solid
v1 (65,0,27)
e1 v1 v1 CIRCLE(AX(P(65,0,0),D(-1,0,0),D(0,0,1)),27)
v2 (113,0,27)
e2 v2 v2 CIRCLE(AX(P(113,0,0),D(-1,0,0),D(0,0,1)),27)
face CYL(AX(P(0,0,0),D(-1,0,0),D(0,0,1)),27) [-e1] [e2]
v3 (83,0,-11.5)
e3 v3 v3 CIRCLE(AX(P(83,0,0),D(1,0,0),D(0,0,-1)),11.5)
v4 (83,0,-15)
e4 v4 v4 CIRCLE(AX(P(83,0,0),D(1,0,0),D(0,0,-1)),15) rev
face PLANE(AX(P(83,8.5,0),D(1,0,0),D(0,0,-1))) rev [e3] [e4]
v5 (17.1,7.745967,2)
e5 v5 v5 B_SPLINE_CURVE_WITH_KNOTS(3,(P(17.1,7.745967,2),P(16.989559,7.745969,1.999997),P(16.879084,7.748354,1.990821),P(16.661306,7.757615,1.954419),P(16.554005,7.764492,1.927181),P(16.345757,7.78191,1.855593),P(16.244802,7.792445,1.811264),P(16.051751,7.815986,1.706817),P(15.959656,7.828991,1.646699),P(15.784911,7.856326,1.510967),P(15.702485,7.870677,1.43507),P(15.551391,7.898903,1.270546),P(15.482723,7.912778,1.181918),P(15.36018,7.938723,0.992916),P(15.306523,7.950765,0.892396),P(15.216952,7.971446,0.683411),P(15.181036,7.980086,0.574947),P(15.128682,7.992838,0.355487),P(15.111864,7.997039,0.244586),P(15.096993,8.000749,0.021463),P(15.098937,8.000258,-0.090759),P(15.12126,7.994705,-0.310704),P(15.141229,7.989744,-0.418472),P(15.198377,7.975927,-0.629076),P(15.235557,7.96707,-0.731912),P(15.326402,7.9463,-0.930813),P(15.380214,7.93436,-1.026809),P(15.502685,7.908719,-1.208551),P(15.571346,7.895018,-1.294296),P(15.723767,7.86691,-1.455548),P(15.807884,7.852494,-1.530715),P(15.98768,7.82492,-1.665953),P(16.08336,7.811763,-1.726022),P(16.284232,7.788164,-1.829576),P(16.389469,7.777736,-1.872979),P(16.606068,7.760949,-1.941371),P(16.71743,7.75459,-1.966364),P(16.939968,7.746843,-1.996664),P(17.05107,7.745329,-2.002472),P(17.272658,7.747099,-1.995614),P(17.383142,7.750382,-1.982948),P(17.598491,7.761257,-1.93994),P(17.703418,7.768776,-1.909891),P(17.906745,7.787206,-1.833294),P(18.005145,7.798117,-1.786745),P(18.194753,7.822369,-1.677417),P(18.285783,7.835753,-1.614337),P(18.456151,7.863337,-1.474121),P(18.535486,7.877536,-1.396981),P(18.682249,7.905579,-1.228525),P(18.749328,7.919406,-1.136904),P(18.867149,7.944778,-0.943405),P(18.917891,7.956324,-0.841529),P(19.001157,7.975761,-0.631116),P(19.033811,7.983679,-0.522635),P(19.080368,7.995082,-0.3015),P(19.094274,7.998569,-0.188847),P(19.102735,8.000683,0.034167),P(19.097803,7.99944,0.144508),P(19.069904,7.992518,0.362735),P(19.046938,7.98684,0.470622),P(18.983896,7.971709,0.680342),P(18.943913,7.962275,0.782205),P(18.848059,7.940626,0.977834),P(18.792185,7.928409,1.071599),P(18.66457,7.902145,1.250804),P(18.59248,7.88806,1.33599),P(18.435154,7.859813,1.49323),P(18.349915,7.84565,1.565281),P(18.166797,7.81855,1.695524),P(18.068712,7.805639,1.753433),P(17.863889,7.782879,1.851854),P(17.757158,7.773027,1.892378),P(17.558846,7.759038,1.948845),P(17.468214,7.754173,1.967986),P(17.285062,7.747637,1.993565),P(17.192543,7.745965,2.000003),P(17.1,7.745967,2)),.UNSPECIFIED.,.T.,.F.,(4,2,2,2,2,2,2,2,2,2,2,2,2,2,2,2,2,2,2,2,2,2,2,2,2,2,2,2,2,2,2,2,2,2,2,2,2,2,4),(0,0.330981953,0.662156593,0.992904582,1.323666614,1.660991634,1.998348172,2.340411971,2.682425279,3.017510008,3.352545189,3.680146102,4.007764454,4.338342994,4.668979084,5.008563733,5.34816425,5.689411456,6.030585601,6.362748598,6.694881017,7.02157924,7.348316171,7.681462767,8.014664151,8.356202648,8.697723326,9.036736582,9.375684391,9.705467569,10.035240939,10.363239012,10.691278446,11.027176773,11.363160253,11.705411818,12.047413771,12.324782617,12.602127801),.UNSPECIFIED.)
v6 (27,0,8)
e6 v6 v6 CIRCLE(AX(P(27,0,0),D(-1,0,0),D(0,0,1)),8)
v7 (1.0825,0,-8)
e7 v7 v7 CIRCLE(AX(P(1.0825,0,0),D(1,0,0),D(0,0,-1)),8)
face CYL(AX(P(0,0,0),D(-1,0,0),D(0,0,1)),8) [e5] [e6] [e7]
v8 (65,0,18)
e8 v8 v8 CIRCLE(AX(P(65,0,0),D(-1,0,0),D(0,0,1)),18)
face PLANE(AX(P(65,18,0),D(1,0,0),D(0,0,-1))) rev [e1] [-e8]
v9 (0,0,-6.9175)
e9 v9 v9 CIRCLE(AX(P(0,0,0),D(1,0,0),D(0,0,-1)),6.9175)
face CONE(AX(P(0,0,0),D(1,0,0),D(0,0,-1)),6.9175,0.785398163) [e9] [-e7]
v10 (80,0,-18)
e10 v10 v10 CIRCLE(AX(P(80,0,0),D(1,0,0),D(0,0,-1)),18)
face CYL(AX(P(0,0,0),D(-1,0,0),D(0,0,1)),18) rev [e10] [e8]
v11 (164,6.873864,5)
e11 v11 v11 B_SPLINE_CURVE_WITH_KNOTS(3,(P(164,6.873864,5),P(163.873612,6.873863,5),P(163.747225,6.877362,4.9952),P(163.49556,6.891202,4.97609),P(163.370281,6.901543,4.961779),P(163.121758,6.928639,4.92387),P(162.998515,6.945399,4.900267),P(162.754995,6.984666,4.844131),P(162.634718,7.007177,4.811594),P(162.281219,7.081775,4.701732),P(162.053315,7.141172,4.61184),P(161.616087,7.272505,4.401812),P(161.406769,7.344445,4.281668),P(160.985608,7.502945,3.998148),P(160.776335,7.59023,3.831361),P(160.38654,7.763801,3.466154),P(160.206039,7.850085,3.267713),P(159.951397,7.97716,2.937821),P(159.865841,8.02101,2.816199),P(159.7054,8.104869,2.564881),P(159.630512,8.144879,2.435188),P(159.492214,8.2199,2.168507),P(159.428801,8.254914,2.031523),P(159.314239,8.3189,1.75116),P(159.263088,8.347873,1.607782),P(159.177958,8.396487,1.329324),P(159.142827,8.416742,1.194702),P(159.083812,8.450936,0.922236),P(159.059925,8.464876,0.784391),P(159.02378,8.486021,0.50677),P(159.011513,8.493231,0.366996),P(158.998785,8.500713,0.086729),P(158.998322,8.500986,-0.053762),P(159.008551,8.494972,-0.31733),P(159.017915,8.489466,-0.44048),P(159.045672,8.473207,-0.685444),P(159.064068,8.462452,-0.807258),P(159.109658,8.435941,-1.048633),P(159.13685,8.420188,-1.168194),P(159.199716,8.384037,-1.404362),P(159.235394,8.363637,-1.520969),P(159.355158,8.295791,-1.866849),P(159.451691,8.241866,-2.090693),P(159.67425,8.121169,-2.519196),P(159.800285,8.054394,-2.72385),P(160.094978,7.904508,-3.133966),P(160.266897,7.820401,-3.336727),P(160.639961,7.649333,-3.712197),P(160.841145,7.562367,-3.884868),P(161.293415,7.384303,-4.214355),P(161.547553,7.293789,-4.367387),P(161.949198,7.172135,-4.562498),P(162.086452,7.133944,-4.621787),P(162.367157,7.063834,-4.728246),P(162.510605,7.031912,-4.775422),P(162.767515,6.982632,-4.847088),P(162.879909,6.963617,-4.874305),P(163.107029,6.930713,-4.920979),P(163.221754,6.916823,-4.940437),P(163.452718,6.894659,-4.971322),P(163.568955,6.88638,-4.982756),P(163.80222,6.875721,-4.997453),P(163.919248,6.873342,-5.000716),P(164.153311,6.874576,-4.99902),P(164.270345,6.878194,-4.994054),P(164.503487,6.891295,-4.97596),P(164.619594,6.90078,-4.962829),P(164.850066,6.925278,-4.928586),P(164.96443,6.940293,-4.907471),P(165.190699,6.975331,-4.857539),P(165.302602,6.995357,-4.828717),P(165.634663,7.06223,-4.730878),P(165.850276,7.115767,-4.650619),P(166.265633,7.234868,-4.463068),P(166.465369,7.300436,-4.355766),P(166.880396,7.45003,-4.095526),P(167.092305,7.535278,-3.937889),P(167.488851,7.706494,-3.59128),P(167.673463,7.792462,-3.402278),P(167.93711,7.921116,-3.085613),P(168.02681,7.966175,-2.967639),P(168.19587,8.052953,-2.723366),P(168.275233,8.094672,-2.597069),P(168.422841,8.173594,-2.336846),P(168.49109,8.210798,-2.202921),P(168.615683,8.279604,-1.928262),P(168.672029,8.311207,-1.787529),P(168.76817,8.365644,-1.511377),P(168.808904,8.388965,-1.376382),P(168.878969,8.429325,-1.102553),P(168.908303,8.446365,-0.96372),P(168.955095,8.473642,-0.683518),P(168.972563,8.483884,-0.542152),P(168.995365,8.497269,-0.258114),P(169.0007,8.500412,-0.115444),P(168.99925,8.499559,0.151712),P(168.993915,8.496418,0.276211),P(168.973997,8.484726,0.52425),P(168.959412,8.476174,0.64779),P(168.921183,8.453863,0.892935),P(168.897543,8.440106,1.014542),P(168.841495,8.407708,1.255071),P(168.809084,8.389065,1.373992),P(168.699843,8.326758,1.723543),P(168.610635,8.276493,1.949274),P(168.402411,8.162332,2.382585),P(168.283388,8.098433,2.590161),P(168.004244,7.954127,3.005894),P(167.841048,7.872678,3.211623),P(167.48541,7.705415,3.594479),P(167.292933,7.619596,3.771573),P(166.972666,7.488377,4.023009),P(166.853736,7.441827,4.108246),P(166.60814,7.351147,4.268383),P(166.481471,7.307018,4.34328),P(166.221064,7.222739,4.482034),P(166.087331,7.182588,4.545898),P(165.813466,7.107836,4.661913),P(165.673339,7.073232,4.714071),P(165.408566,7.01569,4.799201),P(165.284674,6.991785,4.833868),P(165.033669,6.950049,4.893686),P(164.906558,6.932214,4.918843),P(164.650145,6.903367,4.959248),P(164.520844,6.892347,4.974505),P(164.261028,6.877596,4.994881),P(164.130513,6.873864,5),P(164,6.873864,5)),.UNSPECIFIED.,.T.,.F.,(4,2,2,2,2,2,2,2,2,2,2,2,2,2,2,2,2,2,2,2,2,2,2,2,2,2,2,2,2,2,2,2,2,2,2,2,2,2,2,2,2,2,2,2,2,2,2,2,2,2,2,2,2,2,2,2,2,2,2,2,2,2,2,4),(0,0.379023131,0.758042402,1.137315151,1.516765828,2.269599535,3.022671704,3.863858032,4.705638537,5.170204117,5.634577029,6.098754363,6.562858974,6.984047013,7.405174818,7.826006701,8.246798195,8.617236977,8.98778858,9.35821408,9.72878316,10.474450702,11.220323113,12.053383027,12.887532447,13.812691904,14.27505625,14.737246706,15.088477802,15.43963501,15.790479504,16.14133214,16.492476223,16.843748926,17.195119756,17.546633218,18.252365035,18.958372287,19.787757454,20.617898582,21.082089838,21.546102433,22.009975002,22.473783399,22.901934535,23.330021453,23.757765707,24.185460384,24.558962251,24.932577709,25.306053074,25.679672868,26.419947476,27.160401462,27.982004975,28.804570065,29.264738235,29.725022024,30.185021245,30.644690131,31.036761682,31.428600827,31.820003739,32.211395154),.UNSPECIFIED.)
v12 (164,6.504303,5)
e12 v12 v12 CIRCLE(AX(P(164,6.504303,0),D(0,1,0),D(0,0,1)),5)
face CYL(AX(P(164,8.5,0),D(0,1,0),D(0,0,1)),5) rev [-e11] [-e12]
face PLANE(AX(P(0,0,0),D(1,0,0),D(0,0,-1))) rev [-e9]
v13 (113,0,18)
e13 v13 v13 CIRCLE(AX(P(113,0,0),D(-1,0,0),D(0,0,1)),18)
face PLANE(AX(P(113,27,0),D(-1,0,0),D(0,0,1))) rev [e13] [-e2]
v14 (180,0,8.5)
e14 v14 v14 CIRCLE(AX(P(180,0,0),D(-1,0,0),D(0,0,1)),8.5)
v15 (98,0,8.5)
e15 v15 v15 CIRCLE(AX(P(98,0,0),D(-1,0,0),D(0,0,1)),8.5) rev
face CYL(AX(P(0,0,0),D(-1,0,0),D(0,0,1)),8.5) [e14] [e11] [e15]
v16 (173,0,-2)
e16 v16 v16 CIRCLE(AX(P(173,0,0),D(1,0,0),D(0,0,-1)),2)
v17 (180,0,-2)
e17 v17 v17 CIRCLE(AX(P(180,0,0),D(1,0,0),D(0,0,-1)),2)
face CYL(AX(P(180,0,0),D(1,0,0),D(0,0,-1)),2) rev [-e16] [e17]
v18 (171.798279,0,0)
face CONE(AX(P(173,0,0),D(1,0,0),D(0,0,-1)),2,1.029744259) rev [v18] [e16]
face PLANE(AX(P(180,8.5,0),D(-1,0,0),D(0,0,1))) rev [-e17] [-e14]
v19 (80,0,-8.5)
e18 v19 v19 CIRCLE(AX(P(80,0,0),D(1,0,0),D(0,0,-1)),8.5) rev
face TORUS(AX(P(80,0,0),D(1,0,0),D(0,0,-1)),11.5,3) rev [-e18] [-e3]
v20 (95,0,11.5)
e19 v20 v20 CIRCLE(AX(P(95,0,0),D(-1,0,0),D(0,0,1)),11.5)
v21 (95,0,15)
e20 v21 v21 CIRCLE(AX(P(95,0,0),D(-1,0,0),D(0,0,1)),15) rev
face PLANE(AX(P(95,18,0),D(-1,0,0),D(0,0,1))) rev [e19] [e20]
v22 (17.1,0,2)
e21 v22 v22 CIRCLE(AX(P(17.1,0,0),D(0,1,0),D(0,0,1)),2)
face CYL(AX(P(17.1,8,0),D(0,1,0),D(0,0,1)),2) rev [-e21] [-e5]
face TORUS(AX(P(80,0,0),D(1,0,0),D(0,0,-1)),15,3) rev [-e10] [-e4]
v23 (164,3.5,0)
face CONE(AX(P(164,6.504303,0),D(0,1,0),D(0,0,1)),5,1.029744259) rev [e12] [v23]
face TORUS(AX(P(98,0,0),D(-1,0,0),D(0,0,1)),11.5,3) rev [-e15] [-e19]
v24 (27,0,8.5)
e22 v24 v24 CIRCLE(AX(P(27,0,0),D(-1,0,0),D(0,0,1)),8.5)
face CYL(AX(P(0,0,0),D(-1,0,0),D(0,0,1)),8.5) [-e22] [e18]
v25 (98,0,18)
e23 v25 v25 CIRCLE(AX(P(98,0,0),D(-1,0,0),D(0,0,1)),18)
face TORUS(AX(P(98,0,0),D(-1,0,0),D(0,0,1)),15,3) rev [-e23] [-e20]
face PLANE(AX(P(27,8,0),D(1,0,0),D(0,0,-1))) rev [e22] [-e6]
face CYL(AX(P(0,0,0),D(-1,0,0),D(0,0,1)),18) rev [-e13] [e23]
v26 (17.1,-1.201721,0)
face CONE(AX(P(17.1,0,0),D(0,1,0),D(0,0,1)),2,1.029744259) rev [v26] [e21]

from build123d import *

# Parameters (mm, degrees)
FILLET_4_R       = 3
F_4_0MM_4_D      = 4
F_4_0MM_4_DEPTH  = 8
F_4_0MM_4_TIP    = 1.201721238
F_4_0MM_5_D      = 4
F_4_0MM_5_DEPTH  = 7
F_4_0MM_5_TIP    = 1.201721238
F_10_0MM_1_D     = 10
F_10_0MM_1_DEPTH = 1.995696905
F_10_0MM_1_TIP   = 3.004303095


# Read off the part's stored shape, not the designer's step: M16 机械螺纹 螺柱1
with BuildPart() as part:
    # 草图1 → 旋转1 (revolve)
    with BuildSketch(Plane.XY, mode=Mode.PRIVATE) as revolve_1_sk:
        Polygon((0, 0), (0, 8), (27, 8), (27, 8.5), (83, 8.5), (83, 18), (65, 18), (65, 27), (113, 27), (113, 18), (95, 18), (95, 8.5), (180, 8.5), (180, 0), align=None)
    revolve(revolve_1_sk.sketch.rotate(Axis((0, 0, 0), (1, 0, 0)), 90), axis=Axis((0, 0, 0), (1, 0, 0)))

    # 圆角4
    fillet_4_edges = [part.edges().sort_by_distance(p)[0] for p in [
        (95, 0, -8.5),
        (95, 0, -18),
        (83, 0, -18),
        (83, 0, -8.5),
    ]]
    fillet(fillet_4_edges, radius=FILLET_4_R)

    # M16 机械螺纹 螺柱1 outline → M16 机械螺纹 螺柱1 (revolve, cut)
    with BuildSketch(Plane.YX):
        Polygon((8, 1.0825), (6.9175, 0), (8, 0), align=None)
    revolve(axis=Axis((0, 0, 0), (1, 0, 0)), mode=Mode.SUBTRACT)

    # Ø4.0mm 暗销孔4
    with Locations(Plane(origin=(17.1, 8, 0), x_dir=(0, 0, 1), z_dir=(0, 1, 0))):
        with Locations((0, 0)):
            Hole(F_4_0MM_4_D / 2, depth=F_4_0MM_4_DEPTH)
            with Locations((0, 0, -(F_4_0MM_4_DEPTH + F_4_0MM_4_TIP / 2))):  # 118° drill point
                Cone(0, F_4_0MM_4_D / 2, F_4_0MM_4_TIP, mode=Mode.SUBTRACT)

    # Ø4.0mm 暗销孔5
    with Locations(Plane(origin=(180, 0, 0), x_dir=(0, 0, -1), z_dir=(1, 0, 0))):
        with Locations((0, 0)):
            Hole(F_4_0MM_5_D / 2, depth=F_4_0MM_5_DEPTH)
            with Locations((0, 0, -(F_4_0MM_5_DEPTH + F_4_0MM_5_TIP / 2))):  # 118° drill point
                Cone(0, F_4_0MM_5_D / 2, F_4_0MM_5_TIP, mode=Mode.SUBTRACT)

    # Ø10.0mm 暗销孔1
    with Locations(Plane(origin=(164, 8.5, 0), x_dir=(0, 0, 1), z_dir=(0, 1, 0))):
        with Locations((0, 0)):
            Hole(F_10_0MM_1_D / 2, depth=F_10_0MM_1_DEPTH)
            with Locations((0, 0, -(F_10_0MM_1_DEPTH + F_10_0MM_1_TIP / 2))):  # 118° drill point
                Cone(0, F_10_0MM_1_D / 2, F_10_0MM_1_TIP, mode=Mode.SUBTRACT)


solid = part.part
